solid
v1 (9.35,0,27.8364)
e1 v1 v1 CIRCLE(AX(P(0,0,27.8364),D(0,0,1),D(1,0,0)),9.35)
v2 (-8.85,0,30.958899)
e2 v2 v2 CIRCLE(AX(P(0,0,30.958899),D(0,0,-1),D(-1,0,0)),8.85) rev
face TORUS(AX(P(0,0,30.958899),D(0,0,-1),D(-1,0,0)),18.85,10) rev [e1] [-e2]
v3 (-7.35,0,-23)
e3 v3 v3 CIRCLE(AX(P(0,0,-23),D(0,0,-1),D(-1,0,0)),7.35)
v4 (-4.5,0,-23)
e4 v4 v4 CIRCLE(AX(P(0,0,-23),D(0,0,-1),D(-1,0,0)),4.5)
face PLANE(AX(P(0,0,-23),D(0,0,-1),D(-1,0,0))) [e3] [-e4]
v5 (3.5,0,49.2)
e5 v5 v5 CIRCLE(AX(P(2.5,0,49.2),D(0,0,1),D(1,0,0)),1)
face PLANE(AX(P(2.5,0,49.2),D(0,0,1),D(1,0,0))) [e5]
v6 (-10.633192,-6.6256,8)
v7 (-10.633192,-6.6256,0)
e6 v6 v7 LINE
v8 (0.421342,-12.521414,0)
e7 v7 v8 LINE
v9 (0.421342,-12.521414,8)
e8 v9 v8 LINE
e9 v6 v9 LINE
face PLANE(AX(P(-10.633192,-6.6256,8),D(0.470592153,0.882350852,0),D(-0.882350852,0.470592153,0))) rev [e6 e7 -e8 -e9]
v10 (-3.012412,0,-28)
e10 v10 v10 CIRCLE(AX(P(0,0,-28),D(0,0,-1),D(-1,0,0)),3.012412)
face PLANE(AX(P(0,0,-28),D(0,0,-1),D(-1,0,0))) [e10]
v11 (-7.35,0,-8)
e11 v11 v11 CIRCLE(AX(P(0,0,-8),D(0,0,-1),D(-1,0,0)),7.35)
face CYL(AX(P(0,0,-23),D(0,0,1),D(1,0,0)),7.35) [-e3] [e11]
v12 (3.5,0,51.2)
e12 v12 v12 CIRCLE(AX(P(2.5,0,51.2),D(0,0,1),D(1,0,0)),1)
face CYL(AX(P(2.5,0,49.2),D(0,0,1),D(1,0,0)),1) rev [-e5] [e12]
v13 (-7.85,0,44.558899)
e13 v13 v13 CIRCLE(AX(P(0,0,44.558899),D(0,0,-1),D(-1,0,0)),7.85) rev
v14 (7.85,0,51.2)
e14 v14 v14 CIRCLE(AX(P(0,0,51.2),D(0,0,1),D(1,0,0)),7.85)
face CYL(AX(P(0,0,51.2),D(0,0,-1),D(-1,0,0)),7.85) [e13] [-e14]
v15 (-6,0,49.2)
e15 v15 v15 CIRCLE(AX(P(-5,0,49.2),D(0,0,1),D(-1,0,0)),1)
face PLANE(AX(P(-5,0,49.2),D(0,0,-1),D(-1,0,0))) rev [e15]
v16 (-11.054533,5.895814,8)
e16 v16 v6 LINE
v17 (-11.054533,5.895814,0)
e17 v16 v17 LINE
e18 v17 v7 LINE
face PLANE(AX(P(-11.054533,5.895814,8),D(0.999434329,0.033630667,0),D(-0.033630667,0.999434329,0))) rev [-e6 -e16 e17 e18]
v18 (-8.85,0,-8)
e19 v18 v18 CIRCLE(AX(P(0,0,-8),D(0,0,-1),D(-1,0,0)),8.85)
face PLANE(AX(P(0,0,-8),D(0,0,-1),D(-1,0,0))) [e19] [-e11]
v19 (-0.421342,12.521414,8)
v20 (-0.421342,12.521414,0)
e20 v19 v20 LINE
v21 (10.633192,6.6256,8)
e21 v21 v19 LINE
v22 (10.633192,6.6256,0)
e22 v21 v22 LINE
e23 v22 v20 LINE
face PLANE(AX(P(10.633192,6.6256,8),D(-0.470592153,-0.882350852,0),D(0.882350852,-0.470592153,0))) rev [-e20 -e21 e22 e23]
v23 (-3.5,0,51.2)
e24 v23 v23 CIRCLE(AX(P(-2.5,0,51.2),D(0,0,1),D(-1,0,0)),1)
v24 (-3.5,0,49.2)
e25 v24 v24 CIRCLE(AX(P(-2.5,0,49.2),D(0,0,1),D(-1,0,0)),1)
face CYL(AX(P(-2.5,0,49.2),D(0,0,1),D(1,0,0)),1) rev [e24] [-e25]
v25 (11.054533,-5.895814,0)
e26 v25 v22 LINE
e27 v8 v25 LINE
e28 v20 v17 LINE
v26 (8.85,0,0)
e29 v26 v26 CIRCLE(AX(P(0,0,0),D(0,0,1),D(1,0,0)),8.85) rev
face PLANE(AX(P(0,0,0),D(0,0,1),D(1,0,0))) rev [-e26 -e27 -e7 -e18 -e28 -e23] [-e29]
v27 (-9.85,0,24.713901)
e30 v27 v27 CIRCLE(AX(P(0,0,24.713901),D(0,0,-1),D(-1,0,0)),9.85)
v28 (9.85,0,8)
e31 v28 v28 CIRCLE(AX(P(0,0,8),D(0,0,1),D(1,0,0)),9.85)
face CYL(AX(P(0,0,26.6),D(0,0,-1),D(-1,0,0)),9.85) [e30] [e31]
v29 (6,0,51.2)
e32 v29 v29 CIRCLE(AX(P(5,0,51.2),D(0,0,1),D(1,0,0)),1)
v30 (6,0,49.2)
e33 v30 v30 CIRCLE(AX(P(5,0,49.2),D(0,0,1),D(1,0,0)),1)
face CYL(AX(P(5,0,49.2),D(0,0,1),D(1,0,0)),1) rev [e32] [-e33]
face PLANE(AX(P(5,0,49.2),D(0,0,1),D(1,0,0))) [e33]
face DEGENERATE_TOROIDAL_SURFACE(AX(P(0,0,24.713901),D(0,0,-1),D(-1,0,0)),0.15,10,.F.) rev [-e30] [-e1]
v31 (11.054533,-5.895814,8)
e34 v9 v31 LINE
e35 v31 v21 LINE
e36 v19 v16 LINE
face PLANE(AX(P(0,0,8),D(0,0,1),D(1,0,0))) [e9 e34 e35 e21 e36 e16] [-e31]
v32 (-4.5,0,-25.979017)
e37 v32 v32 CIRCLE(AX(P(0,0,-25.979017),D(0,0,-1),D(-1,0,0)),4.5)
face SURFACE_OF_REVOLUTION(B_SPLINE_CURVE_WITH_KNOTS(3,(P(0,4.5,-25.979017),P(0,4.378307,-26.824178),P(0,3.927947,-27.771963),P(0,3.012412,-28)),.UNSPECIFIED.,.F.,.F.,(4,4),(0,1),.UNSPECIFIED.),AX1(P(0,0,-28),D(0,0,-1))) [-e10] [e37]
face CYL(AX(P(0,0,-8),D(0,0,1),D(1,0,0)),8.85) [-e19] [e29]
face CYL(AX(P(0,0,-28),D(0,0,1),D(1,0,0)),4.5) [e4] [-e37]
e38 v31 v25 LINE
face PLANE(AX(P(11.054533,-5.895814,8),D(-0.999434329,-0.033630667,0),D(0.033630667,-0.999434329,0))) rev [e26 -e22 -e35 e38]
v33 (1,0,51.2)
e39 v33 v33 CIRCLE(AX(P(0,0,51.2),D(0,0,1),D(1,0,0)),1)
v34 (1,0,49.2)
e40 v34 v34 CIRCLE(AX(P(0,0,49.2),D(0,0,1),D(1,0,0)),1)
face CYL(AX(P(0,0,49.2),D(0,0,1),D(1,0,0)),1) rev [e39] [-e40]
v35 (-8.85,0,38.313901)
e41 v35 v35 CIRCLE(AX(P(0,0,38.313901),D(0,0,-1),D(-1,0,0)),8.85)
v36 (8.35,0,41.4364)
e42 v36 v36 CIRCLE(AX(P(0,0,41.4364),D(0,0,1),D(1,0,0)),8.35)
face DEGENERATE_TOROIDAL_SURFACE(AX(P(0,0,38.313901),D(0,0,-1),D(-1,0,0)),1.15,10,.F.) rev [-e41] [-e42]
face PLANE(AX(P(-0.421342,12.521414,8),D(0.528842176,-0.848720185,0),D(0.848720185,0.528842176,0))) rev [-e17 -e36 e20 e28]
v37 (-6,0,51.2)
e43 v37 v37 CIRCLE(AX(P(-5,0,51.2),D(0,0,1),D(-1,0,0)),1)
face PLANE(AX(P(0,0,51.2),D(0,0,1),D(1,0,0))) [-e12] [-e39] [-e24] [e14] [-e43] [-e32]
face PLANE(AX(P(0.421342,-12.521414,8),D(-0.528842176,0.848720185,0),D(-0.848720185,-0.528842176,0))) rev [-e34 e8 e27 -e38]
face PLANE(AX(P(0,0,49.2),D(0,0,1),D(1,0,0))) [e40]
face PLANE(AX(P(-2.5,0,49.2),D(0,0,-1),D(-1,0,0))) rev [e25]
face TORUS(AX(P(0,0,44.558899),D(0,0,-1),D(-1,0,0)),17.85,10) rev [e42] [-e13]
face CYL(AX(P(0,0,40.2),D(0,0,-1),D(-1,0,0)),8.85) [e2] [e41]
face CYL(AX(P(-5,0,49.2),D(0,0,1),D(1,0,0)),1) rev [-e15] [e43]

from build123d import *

# Parameters (mm, degrees)
EXTRUDE_1_DEPTH     = 8
SKETCH_2_R          = 9.85
EXTRUDE_2_DEPTH     = 18.6
SKETCH_3_R          = 8.85
EXTRUDE_3_DEPTH     = 13.6
SKETCH_4_R          = 7.85
EXTRUDE_4_DEPTH     = 11
EXTRUDE_START       = 8
SKETCH_8_R          = 8.85
EXTRUDE_7_DEPTH     = 8
SKETCH_9_R          = 7.35
EXTRUDE_8_DEPTH     = 15
SKETCH_10_R         = 4.5
EXTRUDE_9_DEPTH     = 5
FILLET_1_R          = 10
FILLET_2_R          = 10
FILLET_3_R          = 10
FILLET_4_R          = 10
SKETCH_12_R         = 1
CUT_EXTRUDE_1_DEPTH = 2


with BuildPart() as part:
    # ｽｹｯﾁ1 → ﾎﾞｽ - 押し出し1 (new body)
    with BuildSketch(Plane.XY):
        Polygon((11.05453339, -5.895814181), (10.633191552, 6.625599652), (-0.421341838, 12.521413833), (-11.05453339, 5.895814181), (-10.633191552, -6.625599652), (0.421341838, -12.521413833), align=None)
    extrude(amount=EXTRUDE_1_DEPTH)

    # ｽｹｯﾁ2 → ﾎﾞｽ - 押し出し2 (add)
    with BuildSketch(Plane.XY.offset(8)):
        Circle(SKETCH_2_R)
    extrude(amount=EXTRUDE_2_DEPTH)

    # ｽｹｯﾁ3 → ﾎﾞｽ - 押し出し3 (add)
    with BuildSketch(Plane.XY.offset(26.6)):
        Circle(SKETCH_3_R)
    extrude(amount=EXTRUDE_3_DEPTH)

    # ｽｹｯﾁ4 → ﾎﾞｽ - 押し出し4 (add)
    with BuildSketch(Plane.XY.offset(40.2)):
        Circle(SKETCH_4_R)
    extrude(amount=EXTRUDE_4_DEPTH)

    # ｽｹｯﾁ8 → ﾎﾞｽ - 押し出し7 (add)
    with BuildSketch(Plane(origin=(0, 0, 0), x_dir=(-1, 0, 0), z_dir=(0, 0, -1)).offset(EXTRUDE_START)):
        with Locations(Location((0, 0, 0), (0, 0, 180))):
            Circle(SKETCH_8_R)
    extrude(amount=-EXTRUDE_7_DEPTH)

    # ｽｹｯﾁ9 → ﾎﾞｽ - 押し出し8 (add)
    with BuildSketch(Plane(origin=(0, 0, -8), x_dir=(-1, 0, 0), z_dir=(0, 0, -1))):
        Circle(SKETCH_9_R)
    extrude(amount=EXTRUDE_8_DEPTH)

    # ｽｹｯﾁ10 → ﾎﾞｽ - 押し出し9 (add)
    with BuildSketch(Plane(origin=(0, 0, -23), x_dir=(-1, 0, 0), z_dir=(0, 0, -1))):
        Circle(SKETCH_10_R)
    extrude(amount=EXTRUDE_9_DEPTH)

    # ﾌｨﾚｯﾄ1
    # the kernel refuses this fillet: 10 mm, written as the material it adds along each edge
    with BuildSketch(Plane(origin=(0, 0, 26.6), x_dir=(1, 0, 0), z_dir=(0, -1, 0))) as fillet_1_piece_1:
        with BuildLine():
            CenterArc((18.85, 4.358898944), FILLET_1_R, 180, 25.841932763)
            Line((8.85, 4.358898944), (8.65, 4.358898944))
            Line((8.65, 4.358898944), (8.65, 0))
            Line((8.65, 0), (8.85, -0.2))
            ThreePointArc((8.85, -0.2), (9.35, -0.2), (9.67, -0.087177979))
            Line((9.67, -0.087177979), (9.85, 0))
        make_face()
    revolve(axis=Axis((0, 0, 26.6), (0, 0, 1)))

    # ﾌｨﾚｯﾄ2
    fillet_2_edges = [part.edges().sort_by_distance(p)[0] for p in [
        (-9.85, 0, 26.6),
    ]]
    fillet(fillet_2_edges, radius=FILLET_2_R)

    # ﾌｨﾚｯﾄ3
    # the kernel refuses this fillet: 10 mm, written as the material it adds along each edge
    with BuildSketch(Plane(origin=(0, 0, 40.2), x_dir=(1, 0, 0), z_dir=(0, -1, 0))) as fillet_3_piece_1:
        with BuildLine():
            CenterArc((17.85, 4.358898944), FILLET_3_R, 180, 25.841932763)
            Line((7.85, 4.358898944), (7.65, 4.358898944))
            Line((7.65, 4.358898944), (7.65, 0))
            Line((7.65, 0), (7.85, -0.2))
            ThreePointArc((7.85, -0.2), (8.35, -0.2), (8.67, -0.087177979))
            Line((8.67, -0.087177979), (8.85, 0))
        make_face()
    revolve(axis=Axis((0, 0, 40.2), (0, 0, 1)))

    # ﾌｨﾚｯﾄ4
    fillet_4_edges = [part.edges().sort_by_distance(p)[0] for p in [
        (-8.85, 0, 40.2),
    ]]
    fillet(fillet_4_edges, radius=FILLET_4_R)

    # ｽｹｯﾁ11 → ｶｯﾄ - 回転1 (revolve, cut)
    with BuildSketch(Plane(origin=(0, 0, 0), x_dir=(0, 0, -1), z_dir=(1, 0, 0)), mode=Mode.PRIVATE) as cut_revolve_1_sk:
        with BuildLine():
            Line((25.979017437, 4.5), (28, 4.5))
            Line((28, 4.5), (28, 3.012412215))
            add(Edge.make_bspline(
                [(25.979017437, 4.5), (26.824177567, 4.378307252), (27.771962705, 3.927947166), (28, 3.012412215)],
                knots=[0, 0, 0, 0, 1, 1, 1, 1], degree=3))
        make_face()
    revolve(cut_revolve_1_sk.sketch.rotate(Axis((0, 0, -28), (0, 0, 1)), 90), axis=Axis((0, 0, -28), (0, 0, 1)), mode=Mode.SUBTRACT)

    # ｽｹｯﾁ12 → ｶｯﾄ - 押し出し1 (cut)
    with BuildSketch(Plane.XY.offset(51.2)):
        Circle(SKETCH_12_R)
        with Locations((2.5, 0)):
            Circle(SKETCH_12_R)
        with Locations((5, 0)):
            Circle(SKETCH_12_R)
        with Locations(Location((-5, 0, 0), (0, 0, 180))):
            Circle(SKETCH_12_R)
        with Locations(Location((-2.5, 0, 0), (0, 0, 180))):
            Circle(SKETCH_12_R)
    extrude(amount=-CUT_EXTRUDE_1_DEPTH, mode=Mode.SUBTRACT)


solid = part.part
